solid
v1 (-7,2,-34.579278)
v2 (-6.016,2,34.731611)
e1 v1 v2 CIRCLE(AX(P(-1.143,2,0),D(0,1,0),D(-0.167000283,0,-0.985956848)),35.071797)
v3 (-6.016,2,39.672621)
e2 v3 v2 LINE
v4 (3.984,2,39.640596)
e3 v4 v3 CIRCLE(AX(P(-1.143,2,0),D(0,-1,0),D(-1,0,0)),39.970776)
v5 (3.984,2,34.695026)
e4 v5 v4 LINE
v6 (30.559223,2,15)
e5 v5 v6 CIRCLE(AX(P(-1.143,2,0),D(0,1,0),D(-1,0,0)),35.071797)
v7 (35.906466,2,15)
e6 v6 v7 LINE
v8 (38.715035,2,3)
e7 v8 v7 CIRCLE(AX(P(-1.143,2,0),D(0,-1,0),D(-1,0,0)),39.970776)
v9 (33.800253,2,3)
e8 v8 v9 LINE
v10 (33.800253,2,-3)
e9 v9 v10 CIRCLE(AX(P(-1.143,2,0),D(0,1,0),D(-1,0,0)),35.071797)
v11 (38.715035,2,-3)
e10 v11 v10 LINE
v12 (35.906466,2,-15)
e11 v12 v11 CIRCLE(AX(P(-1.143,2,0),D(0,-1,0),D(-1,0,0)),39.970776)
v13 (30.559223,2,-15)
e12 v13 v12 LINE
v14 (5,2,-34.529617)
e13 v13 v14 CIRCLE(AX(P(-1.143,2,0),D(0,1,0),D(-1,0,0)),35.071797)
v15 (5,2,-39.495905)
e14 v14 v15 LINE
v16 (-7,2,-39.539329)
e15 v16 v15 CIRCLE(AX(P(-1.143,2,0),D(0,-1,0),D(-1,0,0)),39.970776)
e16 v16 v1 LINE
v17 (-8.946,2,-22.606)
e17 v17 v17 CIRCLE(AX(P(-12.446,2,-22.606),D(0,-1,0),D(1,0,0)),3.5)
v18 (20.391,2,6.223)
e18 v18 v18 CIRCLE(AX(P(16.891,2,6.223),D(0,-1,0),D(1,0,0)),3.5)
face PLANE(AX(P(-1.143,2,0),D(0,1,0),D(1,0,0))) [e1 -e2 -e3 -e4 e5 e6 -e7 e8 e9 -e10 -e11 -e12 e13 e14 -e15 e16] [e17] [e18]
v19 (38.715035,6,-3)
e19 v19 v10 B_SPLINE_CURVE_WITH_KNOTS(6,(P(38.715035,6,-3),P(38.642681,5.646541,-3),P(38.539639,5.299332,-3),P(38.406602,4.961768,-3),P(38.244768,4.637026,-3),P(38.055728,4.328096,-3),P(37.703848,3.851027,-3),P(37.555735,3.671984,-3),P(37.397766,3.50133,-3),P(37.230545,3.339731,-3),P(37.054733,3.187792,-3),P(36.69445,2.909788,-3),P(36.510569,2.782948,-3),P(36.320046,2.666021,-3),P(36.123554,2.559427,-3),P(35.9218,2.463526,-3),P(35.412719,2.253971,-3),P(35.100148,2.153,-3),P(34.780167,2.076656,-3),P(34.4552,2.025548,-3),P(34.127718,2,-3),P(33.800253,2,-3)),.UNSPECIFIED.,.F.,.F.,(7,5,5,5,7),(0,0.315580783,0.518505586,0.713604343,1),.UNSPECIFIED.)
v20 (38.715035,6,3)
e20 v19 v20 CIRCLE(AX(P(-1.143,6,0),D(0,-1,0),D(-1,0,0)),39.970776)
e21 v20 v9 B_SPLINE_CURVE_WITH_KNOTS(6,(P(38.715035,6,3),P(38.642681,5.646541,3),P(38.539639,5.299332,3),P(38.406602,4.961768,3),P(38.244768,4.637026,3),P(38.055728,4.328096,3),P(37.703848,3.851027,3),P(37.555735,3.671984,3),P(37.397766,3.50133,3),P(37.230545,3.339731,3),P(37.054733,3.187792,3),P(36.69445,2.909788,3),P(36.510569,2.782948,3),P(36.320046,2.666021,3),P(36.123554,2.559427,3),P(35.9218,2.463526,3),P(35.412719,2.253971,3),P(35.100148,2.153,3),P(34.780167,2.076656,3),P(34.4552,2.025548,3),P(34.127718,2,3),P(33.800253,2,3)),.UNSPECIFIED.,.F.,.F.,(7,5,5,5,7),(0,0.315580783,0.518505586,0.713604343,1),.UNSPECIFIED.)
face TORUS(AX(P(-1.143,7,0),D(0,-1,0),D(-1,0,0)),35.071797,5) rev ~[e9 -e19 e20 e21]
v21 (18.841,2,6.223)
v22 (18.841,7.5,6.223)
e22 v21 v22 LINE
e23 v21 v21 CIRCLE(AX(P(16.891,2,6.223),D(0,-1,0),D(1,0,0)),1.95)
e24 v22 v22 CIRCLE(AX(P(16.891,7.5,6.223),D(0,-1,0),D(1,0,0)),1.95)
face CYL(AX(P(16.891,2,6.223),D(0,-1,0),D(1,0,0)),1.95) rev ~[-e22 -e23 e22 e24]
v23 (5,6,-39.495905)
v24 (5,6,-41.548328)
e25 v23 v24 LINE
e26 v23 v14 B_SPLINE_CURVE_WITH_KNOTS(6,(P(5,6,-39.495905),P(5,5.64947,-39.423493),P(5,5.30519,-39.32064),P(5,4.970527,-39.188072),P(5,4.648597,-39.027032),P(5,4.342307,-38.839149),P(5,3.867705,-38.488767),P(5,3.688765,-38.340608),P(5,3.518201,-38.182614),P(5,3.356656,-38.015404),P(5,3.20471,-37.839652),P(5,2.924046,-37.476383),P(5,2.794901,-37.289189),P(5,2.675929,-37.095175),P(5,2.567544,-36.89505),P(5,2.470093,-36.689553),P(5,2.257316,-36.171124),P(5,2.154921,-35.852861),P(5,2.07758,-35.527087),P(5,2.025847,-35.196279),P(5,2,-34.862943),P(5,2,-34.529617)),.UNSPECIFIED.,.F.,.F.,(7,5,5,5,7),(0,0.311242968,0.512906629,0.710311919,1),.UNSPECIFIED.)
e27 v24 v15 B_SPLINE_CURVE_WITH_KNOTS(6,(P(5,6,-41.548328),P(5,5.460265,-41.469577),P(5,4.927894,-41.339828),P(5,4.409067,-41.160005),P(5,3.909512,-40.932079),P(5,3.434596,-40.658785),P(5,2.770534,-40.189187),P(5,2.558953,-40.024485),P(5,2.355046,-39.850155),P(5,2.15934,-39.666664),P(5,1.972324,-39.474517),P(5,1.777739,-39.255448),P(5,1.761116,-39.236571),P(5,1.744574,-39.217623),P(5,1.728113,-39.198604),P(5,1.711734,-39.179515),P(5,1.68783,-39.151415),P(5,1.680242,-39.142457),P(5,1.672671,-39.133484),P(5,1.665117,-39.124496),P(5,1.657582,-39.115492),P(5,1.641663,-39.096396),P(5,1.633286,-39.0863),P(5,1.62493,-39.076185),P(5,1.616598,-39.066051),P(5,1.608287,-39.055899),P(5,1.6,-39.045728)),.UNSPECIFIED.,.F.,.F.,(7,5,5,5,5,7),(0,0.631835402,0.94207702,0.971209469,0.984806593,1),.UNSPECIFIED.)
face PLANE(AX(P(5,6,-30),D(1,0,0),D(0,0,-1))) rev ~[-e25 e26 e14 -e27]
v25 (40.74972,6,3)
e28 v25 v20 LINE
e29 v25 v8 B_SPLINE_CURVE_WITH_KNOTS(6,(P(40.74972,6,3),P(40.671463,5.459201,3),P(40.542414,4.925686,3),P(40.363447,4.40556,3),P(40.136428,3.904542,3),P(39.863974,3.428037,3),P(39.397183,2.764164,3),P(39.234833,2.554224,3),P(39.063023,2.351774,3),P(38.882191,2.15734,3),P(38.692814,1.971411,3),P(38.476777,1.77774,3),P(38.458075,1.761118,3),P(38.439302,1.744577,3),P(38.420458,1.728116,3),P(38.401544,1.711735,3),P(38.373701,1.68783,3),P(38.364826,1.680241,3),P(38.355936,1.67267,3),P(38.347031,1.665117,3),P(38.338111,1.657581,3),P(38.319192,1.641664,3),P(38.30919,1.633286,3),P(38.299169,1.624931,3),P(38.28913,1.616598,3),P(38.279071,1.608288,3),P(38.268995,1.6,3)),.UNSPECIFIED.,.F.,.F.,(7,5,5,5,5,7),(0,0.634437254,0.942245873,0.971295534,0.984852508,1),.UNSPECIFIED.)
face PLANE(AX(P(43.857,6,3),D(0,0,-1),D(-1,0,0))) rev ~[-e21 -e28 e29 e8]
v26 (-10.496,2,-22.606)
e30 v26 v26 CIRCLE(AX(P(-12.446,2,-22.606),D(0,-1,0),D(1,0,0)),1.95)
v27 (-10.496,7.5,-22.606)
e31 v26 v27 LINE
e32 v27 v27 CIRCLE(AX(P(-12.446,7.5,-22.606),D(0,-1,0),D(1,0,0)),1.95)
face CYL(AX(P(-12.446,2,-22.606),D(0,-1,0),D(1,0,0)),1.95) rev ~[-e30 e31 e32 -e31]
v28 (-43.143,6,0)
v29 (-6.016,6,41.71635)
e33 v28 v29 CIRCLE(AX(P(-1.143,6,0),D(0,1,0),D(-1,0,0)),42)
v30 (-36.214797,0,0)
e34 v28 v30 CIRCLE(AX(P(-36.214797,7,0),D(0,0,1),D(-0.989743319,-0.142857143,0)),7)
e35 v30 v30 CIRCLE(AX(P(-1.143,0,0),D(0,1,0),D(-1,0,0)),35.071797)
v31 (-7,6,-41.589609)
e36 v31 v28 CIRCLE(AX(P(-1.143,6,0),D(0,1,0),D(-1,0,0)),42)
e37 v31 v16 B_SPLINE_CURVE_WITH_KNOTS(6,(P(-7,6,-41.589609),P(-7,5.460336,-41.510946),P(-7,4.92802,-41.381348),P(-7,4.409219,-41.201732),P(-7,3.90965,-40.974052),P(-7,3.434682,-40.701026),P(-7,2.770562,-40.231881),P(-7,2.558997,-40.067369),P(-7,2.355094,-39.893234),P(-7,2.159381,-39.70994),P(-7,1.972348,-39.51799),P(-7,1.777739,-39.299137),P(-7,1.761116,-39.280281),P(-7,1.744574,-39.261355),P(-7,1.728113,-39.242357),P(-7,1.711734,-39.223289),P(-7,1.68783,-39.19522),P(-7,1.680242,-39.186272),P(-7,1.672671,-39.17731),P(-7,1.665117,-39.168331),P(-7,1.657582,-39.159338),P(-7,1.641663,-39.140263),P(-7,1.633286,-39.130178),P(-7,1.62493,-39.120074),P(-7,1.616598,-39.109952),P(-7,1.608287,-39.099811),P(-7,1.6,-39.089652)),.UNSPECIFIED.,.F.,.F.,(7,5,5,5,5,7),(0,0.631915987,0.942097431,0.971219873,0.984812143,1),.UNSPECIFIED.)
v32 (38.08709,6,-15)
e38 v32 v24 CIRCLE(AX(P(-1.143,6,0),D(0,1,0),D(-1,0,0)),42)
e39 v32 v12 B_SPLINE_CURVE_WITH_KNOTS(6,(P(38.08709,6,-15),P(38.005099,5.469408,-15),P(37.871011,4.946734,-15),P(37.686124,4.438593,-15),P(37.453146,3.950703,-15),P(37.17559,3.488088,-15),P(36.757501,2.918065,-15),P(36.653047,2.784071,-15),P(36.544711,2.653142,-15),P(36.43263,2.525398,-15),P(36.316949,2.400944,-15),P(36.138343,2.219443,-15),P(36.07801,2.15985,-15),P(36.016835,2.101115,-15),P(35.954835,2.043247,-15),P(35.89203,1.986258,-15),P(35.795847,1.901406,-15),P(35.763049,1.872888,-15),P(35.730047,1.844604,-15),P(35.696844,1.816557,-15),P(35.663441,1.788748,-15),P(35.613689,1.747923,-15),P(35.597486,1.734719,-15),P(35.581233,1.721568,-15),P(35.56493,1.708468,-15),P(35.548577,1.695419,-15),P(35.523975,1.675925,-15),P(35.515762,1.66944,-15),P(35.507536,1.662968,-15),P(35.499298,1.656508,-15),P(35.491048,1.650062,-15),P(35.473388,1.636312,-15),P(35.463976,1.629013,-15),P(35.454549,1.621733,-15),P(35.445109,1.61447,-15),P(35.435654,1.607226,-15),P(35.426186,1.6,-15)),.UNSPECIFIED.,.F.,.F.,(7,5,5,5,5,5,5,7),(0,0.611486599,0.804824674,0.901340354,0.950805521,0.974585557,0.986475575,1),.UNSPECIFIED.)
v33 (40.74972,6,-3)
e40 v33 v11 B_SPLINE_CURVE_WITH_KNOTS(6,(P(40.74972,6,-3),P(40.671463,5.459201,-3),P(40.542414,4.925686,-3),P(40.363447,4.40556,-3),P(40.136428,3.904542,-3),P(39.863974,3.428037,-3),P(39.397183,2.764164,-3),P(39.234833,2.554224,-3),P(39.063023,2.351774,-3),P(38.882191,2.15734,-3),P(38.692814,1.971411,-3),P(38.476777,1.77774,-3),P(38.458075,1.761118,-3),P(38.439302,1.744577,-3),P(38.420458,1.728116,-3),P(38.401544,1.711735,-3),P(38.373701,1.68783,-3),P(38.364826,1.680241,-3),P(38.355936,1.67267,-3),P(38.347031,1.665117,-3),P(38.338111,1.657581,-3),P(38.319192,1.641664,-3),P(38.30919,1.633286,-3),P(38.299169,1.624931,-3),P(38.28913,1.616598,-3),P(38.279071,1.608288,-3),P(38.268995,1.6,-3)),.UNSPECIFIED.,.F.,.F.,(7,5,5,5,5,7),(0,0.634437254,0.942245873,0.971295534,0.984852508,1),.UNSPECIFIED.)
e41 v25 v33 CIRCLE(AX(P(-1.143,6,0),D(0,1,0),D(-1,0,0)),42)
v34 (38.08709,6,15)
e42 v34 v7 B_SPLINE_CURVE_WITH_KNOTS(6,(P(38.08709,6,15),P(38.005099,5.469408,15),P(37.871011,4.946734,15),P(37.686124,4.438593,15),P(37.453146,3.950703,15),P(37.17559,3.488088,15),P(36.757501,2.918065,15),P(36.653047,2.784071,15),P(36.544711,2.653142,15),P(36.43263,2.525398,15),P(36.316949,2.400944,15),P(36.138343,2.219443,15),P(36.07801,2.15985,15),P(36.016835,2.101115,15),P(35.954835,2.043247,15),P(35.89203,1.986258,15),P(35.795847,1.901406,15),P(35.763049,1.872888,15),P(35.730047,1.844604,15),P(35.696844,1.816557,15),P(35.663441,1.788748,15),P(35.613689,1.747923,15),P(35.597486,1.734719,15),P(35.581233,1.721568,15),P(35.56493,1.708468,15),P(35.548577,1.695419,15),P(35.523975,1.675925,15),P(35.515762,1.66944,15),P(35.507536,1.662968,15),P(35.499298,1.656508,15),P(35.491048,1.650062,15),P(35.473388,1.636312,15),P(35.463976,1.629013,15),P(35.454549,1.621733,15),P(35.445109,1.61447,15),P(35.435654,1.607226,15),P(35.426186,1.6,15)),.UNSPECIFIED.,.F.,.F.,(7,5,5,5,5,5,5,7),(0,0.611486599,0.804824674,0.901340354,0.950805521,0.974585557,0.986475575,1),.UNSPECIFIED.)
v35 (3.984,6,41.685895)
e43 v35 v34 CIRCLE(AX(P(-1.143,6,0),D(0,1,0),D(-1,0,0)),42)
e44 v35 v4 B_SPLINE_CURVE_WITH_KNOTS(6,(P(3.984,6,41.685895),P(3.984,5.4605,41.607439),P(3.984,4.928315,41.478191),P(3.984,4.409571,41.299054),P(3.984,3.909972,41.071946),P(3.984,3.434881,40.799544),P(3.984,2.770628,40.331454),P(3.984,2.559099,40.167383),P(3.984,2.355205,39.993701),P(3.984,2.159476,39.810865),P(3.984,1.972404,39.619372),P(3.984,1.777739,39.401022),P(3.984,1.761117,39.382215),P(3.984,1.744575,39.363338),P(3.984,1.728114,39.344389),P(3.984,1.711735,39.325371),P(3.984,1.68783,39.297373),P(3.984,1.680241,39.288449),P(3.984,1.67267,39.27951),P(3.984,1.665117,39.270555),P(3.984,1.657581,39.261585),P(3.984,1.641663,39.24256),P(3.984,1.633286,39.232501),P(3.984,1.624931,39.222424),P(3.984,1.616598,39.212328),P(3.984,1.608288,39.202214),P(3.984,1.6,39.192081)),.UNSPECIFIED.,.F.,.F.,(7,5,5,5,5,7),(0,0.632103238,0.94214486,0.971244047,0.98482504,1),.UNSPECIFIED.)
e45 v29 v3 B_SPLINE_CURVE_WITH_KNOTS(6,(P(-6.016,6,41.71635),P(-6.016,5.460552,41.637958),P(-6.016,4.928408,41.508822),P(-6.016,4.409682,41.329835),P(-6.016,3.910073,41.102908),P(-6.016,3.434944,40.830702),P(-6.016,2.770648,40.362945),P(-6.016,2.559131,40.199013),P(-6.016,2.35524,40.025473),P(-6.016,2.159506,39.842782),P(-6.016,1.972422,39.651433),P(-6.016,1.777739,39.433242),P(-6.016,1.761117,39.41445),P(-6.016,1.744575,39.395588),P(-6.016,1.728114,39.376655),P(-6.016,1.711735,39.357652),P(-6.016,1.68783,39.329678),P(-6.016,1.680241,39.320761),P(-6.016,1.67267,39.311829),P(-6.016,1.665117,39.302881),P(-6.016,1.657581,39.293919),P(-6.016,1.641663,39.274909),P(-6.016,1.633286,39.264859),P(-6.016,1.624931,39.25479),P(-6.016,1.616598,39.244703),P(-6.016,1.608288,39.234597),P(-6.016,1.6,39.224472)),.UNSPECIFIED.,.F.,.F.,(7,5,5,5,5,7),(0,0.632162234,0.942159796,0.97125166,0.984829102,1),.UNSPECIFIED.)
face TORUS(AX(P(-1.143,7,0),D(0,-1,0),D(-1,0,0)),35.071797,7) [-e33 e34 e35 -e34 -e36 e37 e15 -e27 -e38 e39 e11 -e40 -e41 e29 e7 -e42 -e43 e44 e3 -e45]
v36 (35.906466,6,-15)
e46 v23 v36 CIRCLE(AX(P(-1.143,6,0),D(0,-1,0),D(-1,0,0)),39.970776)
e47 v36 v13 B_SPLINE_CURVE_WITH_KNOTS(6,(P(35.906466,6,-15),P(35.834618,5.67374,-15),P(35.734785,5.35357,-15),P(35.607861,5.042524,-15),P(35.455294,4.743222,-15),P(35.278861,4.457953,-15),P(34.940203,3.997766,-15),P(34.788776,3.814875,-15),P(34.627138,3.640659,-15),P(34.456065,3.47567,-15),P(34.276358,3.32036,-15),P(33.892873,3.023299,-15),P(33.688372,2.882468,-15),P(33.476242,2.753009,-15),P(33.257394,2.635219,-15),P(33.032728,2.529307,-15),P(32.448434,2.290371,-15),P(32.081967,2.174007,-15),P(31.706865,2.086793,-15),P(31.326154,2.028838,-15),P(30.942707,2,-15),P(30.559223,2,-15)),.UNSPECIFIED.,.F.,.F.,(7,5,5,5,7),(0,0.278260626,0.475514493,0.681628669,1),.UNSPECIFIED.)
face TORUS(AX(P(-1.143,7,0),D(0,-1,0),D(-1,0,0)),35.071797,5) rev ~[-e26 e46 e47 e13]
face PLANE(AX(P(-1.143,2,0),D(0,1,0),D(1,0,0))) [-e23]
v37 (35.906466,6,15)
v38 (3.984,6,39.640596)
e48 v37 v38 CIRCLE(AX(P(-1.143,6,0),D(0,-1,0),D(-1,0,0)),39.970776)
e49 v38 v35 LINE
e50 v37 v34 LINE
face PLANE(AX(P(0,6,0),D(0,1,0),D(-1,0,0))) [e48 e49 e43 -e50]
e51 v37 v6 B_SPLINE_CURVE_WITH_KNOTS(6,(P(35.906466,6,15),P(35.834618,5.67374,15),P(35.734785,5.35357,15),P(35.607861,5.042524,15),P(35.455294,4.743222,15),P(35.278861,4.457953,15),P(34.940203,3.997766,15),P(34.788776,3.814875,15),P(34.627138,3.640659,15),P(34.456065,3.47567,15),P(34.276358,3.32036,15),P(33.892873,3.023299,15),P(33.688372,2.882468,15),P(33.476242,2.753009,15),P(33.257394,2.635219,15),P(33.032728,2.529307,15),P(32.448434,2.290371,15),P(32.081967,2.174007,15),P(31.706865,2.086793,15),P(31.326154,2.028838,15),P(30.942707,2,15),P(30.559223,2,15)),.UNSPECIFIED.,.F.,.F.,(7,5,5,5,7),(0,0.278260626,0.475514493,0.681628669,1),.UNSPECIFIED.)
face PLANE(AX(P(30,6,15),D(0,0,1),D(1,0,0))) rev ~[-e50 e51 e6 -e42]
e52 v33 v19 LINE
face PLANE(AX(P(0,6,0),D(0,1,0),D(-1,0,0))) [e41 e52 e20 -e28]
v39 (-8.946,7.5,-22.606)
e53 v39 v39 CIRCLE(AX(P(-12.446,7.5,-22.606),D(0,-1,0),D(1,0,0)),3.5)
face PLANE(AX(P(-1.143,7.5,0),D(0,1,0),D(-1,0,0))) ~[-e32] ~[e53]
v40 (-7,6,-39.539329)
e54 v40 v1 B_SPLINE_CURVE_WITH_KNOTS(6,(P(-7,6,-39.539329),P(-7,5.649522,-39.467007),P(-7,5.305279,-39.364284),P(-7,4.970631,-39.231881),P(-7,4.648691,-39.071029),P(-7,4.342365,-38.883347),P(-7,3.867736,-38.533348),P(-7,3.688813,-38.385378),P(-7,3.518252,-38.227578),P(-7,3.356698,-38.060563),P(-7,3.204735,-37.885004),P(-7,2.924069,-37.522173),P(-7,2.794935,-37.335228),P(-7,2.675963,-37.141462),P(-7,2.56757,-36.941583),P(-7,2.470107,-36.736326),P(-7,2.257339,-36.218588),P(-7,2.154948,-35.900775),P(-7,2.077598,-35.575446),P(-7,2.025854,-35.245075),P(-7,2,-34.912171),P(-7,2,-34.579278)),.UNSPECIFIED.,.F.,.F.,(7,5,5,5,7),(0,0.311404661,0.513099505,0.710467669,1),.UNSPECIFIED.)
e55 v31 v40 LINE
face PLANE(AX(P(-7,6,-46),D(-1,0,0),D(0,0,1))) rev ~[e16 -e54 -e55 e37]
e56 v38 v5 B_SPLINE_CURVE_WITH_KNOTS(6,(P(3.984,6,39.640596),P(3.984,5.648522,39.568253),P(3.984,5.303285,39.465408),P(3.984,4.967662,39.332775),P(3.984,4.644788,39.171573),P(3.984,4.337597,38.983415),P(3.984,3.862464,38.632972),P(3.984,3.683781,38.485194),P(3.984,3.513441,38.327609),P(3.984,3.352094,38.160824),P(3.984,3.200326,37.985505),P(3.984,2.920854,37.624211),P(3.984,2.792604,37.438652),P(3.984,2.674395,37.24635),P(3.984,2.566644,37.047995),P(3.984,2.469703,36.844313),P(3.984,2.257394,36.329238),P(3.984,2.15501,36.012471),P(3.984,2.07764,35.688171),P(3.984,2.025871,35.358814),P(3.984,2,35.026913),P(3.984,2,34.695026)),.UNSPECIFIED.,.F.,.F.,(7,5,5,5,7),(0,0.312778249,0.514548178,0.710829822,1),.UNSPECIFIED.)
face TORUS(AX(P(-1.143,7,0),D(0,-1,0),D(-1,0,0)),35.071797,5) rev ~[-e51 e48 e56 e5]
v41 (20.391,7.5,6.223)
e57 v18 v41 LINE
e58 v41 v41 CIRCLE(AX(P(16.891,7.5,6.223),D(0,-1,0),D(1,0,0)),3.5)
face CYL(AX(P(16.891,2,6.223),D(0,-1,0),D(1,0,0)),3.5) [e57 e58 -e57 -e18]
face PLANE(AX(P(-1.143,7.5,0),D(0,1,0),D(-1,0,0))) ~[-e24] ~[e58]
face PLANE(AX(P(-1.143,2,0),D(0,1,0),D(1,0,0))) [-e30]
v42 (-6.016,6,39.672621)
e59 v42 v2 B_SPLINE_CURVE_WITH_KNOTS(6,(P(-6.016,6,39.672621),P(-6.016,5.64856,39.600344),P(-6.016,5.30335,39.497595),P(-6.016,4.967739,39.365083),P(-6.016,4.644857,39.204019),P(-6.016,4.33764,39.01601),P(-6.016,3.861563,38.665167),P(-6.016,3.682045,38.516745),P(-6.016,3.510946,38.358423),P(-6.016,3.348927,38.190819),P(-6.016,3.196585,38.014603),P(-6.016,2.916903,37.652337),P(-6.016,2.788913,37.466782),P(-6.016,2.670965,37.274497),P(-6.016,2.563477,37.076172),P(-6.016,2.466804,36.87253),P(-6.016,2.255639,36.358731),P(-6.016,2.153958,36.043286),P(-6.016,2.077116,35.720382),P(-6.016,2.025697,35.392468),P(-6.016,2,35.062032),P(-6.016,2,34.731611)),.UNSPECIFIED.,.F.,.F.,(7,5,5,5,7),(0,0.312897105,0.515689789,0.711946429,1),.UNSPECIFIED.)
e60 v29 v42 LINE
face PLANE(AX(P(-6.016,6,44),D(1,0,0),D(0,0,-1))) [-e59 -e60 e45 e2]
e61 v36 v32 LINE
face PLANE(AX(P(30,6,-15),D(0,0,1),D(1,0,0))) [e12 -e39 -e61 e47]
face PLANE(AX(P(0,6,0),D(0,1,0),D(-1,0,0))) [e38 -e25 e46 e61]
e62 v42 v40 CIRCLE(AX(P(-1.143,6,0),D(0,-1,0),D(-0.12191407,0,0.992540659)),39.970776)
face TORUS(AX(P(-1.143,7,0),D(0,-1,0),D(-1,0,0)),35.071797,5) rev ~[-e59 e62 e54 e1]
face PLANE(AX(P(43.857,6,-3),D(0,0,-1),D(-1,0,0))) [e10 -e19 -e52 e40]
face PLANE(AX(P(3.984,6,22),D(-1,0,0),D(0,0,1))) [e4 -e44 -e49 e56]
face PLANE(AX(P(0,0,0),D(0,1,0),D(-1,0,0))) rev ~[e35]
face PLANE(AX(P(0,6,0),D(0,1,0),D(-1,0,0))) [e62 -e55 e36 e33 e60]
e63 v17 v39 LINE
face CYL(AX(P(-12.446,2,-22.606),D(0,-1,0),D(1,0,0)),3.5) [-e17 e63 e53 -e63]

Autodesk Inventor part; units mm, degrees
ref_plane "YZ Plane" through (0, 0, 0) normal (1, 0, 0) x (0, 1, 0)
ref_plane "XZ Plane" through (0, 0, 0) normal (0, 1, 0) x (-1, 0, 0)
ref_plane "XY Plane" through (0, 0, 0) normal (0, 0, 1) x (1, 0, 0)
sketch "Sketch1" plane through (0, 0, 0) normal (0, 1, 0) x (-1, 0, 0)
  circle A0 centre (1.143, 0) radius 39 construction
  circle A1 centre (1.143, 0) radius 42
  line L0 (-21.857, 14) -> (-36.857, 14) construction
  line L1 (-36.857, 14) -> (-36.857, 5) construction
  line L2 (-36.857, 5) -> (-21.857, 5) construction
  line L3 (-21.857, 5) -> (-21.857, 14) construction
  line L4 (1.143, 0) -> (-37.857, 0)
  line L5 (0, 0) -> (0, -22) construction
  dimension "d0" = 78
  dimension "d1" = 9
  dimension "d2" = 15
  dimension "d3" = 5
  dimension "d4" = 23
  dimension "d5" = 84
  dimension "d11" = 1.143
extrude "Extrusion1" add sketch "Sketch1" along normal blind 6
fillet "Fillet1" radius 7 1 edges at (40.857, 0, 0)
shell "Shell1" thickness 2 removed faces 1 at (-4.0377, 6, 12.235)
sketch "Sketch2" plane through (-1.143, 2, 0) normal (0, 1, 0) x (1, 0, 0)
  circle A0 centre (-11.303, -22.606) radius 1.95
  circle A1 centre (18.034, 6.223) radius 1.95
  circle A2 centre (-11.303, -22.606) radius 3.5
  circle A3 centre (18.034, 6.223) radius 3.5
  point P0 (1.143, 0)
  dimension "d12" = 3.9
  dimension "d13" = 3.9
  dimension "d14" = 6.223
  dimension "d15" = 16.891
  dimension "d16" = 22.606
  dimension "d17" = 12.446
  dimension "d18" = 7
  dimension "d19" = 7
extrude "Extrusion2" add sketch "Sketch2" along normal blind 5.5
sketch "Sketch3" plane through (-1.143, 2, 0) normal (0, 1, 0) x (1, 0, 0)
  line L0 (7.5, 19.5) -> (-25.5, 19.5) construction
  line L1 (-25.5, 19.5) -> (-25.5, -9.5) construction
  line L2 (-25.5, -9.5) -> (7.5, -9.5) construction
  line L3 (7.5, -9.5) -> (7.5, 19.5) construction
  line L4 (7.5, 19.5) -> (-25.5, -9.5) construction
  line L5 (-25.5, 19.5) -> (7.5, -9.5) construction
  point P0 (1.143, 0)
  point P1 (-9, 5)
  dimension "d22" = 33
  dimension "d23" = 29
sketch "Sketch5" plane through (-1.143, 6, 0) normal (0, 1, 0) x (1, 0, 0)
  line L0 (31.143, -15) -> (45, -15)
  line L1 (45, -15) -> (45, -3)
  line L2 (45, -3) -> (31.143, -3)
  line L3 (31.143, -3) -> (31.143, -15)
  line L4 (1.143, 0) -> (-32, 0) construction
  line L5 (31.143, 15) -> (45, 15)
  line L6 (45, 15) -> (45, 3)
  line L7 (45, 3) -> (31.143, 3)
  line L8 (31.143, 3) -> (31.143, 15)
  line L9 (-5.857, 30) -> (6.143, 30)
  line L10 (6.143, 30) -> (6.143, 46)
  line L11 (6.143, 46) -> (-5.857, 46)
  line L12 (-5.857, 46) -> (-5.857, 30)
  line L13 (-5.857, 30) -> (6.143, 46) construction
  line L14 (6.143, 30) -> (-5.857, 46) construction
  line L15 (-4.873, -22) -> (5.127, -22)
  line L16 (5.127, -22) -> (5.127, -44)
  line L17 (5.127, -44) -> (-4.873, -44)
  line L18 (-4.873, -44) -> (-4.873, -22)
  line L19 (-4.873, -22) -> (5.127, -44) construction
  line L20 (5.127, -22) -> (-4.873, -44) construction
  point P0 (0.143, 38)
  point P1 (0.127, -33)
  dimension "d24" = 3
  dimension "d25" = 12
  dimension "d26" = 30
  dimension "d29" = 1
  dimension "d30" = 12
  dimension "d31" = 1.016
  dimension "d32" = 10
extrude "Extrusion3" cut sketch "Sketch5" against normal up to surface (4 mm away)
mirror "Mirror1" about plane through (0, 0, 0) normal (0, 0, 1) of "Extrusion2"
sketch "Sketch6" plane through (-12.446, 7.5, 22.606) normal (0, 1, 0) x (1, 0, 0)
  circle A0 centre (0, 0) radius 4.9497
  circle A1 centre (29.337, 28.829) radius 1.95 projected
  circle A2 centre (29.337, 28.829) radius 4.3979
  point P0 (12.446, 22.606)
extrude "Extrusion4" cut sketch "Sketch6" against normal up to surface (5.5 mm away) contours A0 | A1 | A2
properties part number "Case top"
